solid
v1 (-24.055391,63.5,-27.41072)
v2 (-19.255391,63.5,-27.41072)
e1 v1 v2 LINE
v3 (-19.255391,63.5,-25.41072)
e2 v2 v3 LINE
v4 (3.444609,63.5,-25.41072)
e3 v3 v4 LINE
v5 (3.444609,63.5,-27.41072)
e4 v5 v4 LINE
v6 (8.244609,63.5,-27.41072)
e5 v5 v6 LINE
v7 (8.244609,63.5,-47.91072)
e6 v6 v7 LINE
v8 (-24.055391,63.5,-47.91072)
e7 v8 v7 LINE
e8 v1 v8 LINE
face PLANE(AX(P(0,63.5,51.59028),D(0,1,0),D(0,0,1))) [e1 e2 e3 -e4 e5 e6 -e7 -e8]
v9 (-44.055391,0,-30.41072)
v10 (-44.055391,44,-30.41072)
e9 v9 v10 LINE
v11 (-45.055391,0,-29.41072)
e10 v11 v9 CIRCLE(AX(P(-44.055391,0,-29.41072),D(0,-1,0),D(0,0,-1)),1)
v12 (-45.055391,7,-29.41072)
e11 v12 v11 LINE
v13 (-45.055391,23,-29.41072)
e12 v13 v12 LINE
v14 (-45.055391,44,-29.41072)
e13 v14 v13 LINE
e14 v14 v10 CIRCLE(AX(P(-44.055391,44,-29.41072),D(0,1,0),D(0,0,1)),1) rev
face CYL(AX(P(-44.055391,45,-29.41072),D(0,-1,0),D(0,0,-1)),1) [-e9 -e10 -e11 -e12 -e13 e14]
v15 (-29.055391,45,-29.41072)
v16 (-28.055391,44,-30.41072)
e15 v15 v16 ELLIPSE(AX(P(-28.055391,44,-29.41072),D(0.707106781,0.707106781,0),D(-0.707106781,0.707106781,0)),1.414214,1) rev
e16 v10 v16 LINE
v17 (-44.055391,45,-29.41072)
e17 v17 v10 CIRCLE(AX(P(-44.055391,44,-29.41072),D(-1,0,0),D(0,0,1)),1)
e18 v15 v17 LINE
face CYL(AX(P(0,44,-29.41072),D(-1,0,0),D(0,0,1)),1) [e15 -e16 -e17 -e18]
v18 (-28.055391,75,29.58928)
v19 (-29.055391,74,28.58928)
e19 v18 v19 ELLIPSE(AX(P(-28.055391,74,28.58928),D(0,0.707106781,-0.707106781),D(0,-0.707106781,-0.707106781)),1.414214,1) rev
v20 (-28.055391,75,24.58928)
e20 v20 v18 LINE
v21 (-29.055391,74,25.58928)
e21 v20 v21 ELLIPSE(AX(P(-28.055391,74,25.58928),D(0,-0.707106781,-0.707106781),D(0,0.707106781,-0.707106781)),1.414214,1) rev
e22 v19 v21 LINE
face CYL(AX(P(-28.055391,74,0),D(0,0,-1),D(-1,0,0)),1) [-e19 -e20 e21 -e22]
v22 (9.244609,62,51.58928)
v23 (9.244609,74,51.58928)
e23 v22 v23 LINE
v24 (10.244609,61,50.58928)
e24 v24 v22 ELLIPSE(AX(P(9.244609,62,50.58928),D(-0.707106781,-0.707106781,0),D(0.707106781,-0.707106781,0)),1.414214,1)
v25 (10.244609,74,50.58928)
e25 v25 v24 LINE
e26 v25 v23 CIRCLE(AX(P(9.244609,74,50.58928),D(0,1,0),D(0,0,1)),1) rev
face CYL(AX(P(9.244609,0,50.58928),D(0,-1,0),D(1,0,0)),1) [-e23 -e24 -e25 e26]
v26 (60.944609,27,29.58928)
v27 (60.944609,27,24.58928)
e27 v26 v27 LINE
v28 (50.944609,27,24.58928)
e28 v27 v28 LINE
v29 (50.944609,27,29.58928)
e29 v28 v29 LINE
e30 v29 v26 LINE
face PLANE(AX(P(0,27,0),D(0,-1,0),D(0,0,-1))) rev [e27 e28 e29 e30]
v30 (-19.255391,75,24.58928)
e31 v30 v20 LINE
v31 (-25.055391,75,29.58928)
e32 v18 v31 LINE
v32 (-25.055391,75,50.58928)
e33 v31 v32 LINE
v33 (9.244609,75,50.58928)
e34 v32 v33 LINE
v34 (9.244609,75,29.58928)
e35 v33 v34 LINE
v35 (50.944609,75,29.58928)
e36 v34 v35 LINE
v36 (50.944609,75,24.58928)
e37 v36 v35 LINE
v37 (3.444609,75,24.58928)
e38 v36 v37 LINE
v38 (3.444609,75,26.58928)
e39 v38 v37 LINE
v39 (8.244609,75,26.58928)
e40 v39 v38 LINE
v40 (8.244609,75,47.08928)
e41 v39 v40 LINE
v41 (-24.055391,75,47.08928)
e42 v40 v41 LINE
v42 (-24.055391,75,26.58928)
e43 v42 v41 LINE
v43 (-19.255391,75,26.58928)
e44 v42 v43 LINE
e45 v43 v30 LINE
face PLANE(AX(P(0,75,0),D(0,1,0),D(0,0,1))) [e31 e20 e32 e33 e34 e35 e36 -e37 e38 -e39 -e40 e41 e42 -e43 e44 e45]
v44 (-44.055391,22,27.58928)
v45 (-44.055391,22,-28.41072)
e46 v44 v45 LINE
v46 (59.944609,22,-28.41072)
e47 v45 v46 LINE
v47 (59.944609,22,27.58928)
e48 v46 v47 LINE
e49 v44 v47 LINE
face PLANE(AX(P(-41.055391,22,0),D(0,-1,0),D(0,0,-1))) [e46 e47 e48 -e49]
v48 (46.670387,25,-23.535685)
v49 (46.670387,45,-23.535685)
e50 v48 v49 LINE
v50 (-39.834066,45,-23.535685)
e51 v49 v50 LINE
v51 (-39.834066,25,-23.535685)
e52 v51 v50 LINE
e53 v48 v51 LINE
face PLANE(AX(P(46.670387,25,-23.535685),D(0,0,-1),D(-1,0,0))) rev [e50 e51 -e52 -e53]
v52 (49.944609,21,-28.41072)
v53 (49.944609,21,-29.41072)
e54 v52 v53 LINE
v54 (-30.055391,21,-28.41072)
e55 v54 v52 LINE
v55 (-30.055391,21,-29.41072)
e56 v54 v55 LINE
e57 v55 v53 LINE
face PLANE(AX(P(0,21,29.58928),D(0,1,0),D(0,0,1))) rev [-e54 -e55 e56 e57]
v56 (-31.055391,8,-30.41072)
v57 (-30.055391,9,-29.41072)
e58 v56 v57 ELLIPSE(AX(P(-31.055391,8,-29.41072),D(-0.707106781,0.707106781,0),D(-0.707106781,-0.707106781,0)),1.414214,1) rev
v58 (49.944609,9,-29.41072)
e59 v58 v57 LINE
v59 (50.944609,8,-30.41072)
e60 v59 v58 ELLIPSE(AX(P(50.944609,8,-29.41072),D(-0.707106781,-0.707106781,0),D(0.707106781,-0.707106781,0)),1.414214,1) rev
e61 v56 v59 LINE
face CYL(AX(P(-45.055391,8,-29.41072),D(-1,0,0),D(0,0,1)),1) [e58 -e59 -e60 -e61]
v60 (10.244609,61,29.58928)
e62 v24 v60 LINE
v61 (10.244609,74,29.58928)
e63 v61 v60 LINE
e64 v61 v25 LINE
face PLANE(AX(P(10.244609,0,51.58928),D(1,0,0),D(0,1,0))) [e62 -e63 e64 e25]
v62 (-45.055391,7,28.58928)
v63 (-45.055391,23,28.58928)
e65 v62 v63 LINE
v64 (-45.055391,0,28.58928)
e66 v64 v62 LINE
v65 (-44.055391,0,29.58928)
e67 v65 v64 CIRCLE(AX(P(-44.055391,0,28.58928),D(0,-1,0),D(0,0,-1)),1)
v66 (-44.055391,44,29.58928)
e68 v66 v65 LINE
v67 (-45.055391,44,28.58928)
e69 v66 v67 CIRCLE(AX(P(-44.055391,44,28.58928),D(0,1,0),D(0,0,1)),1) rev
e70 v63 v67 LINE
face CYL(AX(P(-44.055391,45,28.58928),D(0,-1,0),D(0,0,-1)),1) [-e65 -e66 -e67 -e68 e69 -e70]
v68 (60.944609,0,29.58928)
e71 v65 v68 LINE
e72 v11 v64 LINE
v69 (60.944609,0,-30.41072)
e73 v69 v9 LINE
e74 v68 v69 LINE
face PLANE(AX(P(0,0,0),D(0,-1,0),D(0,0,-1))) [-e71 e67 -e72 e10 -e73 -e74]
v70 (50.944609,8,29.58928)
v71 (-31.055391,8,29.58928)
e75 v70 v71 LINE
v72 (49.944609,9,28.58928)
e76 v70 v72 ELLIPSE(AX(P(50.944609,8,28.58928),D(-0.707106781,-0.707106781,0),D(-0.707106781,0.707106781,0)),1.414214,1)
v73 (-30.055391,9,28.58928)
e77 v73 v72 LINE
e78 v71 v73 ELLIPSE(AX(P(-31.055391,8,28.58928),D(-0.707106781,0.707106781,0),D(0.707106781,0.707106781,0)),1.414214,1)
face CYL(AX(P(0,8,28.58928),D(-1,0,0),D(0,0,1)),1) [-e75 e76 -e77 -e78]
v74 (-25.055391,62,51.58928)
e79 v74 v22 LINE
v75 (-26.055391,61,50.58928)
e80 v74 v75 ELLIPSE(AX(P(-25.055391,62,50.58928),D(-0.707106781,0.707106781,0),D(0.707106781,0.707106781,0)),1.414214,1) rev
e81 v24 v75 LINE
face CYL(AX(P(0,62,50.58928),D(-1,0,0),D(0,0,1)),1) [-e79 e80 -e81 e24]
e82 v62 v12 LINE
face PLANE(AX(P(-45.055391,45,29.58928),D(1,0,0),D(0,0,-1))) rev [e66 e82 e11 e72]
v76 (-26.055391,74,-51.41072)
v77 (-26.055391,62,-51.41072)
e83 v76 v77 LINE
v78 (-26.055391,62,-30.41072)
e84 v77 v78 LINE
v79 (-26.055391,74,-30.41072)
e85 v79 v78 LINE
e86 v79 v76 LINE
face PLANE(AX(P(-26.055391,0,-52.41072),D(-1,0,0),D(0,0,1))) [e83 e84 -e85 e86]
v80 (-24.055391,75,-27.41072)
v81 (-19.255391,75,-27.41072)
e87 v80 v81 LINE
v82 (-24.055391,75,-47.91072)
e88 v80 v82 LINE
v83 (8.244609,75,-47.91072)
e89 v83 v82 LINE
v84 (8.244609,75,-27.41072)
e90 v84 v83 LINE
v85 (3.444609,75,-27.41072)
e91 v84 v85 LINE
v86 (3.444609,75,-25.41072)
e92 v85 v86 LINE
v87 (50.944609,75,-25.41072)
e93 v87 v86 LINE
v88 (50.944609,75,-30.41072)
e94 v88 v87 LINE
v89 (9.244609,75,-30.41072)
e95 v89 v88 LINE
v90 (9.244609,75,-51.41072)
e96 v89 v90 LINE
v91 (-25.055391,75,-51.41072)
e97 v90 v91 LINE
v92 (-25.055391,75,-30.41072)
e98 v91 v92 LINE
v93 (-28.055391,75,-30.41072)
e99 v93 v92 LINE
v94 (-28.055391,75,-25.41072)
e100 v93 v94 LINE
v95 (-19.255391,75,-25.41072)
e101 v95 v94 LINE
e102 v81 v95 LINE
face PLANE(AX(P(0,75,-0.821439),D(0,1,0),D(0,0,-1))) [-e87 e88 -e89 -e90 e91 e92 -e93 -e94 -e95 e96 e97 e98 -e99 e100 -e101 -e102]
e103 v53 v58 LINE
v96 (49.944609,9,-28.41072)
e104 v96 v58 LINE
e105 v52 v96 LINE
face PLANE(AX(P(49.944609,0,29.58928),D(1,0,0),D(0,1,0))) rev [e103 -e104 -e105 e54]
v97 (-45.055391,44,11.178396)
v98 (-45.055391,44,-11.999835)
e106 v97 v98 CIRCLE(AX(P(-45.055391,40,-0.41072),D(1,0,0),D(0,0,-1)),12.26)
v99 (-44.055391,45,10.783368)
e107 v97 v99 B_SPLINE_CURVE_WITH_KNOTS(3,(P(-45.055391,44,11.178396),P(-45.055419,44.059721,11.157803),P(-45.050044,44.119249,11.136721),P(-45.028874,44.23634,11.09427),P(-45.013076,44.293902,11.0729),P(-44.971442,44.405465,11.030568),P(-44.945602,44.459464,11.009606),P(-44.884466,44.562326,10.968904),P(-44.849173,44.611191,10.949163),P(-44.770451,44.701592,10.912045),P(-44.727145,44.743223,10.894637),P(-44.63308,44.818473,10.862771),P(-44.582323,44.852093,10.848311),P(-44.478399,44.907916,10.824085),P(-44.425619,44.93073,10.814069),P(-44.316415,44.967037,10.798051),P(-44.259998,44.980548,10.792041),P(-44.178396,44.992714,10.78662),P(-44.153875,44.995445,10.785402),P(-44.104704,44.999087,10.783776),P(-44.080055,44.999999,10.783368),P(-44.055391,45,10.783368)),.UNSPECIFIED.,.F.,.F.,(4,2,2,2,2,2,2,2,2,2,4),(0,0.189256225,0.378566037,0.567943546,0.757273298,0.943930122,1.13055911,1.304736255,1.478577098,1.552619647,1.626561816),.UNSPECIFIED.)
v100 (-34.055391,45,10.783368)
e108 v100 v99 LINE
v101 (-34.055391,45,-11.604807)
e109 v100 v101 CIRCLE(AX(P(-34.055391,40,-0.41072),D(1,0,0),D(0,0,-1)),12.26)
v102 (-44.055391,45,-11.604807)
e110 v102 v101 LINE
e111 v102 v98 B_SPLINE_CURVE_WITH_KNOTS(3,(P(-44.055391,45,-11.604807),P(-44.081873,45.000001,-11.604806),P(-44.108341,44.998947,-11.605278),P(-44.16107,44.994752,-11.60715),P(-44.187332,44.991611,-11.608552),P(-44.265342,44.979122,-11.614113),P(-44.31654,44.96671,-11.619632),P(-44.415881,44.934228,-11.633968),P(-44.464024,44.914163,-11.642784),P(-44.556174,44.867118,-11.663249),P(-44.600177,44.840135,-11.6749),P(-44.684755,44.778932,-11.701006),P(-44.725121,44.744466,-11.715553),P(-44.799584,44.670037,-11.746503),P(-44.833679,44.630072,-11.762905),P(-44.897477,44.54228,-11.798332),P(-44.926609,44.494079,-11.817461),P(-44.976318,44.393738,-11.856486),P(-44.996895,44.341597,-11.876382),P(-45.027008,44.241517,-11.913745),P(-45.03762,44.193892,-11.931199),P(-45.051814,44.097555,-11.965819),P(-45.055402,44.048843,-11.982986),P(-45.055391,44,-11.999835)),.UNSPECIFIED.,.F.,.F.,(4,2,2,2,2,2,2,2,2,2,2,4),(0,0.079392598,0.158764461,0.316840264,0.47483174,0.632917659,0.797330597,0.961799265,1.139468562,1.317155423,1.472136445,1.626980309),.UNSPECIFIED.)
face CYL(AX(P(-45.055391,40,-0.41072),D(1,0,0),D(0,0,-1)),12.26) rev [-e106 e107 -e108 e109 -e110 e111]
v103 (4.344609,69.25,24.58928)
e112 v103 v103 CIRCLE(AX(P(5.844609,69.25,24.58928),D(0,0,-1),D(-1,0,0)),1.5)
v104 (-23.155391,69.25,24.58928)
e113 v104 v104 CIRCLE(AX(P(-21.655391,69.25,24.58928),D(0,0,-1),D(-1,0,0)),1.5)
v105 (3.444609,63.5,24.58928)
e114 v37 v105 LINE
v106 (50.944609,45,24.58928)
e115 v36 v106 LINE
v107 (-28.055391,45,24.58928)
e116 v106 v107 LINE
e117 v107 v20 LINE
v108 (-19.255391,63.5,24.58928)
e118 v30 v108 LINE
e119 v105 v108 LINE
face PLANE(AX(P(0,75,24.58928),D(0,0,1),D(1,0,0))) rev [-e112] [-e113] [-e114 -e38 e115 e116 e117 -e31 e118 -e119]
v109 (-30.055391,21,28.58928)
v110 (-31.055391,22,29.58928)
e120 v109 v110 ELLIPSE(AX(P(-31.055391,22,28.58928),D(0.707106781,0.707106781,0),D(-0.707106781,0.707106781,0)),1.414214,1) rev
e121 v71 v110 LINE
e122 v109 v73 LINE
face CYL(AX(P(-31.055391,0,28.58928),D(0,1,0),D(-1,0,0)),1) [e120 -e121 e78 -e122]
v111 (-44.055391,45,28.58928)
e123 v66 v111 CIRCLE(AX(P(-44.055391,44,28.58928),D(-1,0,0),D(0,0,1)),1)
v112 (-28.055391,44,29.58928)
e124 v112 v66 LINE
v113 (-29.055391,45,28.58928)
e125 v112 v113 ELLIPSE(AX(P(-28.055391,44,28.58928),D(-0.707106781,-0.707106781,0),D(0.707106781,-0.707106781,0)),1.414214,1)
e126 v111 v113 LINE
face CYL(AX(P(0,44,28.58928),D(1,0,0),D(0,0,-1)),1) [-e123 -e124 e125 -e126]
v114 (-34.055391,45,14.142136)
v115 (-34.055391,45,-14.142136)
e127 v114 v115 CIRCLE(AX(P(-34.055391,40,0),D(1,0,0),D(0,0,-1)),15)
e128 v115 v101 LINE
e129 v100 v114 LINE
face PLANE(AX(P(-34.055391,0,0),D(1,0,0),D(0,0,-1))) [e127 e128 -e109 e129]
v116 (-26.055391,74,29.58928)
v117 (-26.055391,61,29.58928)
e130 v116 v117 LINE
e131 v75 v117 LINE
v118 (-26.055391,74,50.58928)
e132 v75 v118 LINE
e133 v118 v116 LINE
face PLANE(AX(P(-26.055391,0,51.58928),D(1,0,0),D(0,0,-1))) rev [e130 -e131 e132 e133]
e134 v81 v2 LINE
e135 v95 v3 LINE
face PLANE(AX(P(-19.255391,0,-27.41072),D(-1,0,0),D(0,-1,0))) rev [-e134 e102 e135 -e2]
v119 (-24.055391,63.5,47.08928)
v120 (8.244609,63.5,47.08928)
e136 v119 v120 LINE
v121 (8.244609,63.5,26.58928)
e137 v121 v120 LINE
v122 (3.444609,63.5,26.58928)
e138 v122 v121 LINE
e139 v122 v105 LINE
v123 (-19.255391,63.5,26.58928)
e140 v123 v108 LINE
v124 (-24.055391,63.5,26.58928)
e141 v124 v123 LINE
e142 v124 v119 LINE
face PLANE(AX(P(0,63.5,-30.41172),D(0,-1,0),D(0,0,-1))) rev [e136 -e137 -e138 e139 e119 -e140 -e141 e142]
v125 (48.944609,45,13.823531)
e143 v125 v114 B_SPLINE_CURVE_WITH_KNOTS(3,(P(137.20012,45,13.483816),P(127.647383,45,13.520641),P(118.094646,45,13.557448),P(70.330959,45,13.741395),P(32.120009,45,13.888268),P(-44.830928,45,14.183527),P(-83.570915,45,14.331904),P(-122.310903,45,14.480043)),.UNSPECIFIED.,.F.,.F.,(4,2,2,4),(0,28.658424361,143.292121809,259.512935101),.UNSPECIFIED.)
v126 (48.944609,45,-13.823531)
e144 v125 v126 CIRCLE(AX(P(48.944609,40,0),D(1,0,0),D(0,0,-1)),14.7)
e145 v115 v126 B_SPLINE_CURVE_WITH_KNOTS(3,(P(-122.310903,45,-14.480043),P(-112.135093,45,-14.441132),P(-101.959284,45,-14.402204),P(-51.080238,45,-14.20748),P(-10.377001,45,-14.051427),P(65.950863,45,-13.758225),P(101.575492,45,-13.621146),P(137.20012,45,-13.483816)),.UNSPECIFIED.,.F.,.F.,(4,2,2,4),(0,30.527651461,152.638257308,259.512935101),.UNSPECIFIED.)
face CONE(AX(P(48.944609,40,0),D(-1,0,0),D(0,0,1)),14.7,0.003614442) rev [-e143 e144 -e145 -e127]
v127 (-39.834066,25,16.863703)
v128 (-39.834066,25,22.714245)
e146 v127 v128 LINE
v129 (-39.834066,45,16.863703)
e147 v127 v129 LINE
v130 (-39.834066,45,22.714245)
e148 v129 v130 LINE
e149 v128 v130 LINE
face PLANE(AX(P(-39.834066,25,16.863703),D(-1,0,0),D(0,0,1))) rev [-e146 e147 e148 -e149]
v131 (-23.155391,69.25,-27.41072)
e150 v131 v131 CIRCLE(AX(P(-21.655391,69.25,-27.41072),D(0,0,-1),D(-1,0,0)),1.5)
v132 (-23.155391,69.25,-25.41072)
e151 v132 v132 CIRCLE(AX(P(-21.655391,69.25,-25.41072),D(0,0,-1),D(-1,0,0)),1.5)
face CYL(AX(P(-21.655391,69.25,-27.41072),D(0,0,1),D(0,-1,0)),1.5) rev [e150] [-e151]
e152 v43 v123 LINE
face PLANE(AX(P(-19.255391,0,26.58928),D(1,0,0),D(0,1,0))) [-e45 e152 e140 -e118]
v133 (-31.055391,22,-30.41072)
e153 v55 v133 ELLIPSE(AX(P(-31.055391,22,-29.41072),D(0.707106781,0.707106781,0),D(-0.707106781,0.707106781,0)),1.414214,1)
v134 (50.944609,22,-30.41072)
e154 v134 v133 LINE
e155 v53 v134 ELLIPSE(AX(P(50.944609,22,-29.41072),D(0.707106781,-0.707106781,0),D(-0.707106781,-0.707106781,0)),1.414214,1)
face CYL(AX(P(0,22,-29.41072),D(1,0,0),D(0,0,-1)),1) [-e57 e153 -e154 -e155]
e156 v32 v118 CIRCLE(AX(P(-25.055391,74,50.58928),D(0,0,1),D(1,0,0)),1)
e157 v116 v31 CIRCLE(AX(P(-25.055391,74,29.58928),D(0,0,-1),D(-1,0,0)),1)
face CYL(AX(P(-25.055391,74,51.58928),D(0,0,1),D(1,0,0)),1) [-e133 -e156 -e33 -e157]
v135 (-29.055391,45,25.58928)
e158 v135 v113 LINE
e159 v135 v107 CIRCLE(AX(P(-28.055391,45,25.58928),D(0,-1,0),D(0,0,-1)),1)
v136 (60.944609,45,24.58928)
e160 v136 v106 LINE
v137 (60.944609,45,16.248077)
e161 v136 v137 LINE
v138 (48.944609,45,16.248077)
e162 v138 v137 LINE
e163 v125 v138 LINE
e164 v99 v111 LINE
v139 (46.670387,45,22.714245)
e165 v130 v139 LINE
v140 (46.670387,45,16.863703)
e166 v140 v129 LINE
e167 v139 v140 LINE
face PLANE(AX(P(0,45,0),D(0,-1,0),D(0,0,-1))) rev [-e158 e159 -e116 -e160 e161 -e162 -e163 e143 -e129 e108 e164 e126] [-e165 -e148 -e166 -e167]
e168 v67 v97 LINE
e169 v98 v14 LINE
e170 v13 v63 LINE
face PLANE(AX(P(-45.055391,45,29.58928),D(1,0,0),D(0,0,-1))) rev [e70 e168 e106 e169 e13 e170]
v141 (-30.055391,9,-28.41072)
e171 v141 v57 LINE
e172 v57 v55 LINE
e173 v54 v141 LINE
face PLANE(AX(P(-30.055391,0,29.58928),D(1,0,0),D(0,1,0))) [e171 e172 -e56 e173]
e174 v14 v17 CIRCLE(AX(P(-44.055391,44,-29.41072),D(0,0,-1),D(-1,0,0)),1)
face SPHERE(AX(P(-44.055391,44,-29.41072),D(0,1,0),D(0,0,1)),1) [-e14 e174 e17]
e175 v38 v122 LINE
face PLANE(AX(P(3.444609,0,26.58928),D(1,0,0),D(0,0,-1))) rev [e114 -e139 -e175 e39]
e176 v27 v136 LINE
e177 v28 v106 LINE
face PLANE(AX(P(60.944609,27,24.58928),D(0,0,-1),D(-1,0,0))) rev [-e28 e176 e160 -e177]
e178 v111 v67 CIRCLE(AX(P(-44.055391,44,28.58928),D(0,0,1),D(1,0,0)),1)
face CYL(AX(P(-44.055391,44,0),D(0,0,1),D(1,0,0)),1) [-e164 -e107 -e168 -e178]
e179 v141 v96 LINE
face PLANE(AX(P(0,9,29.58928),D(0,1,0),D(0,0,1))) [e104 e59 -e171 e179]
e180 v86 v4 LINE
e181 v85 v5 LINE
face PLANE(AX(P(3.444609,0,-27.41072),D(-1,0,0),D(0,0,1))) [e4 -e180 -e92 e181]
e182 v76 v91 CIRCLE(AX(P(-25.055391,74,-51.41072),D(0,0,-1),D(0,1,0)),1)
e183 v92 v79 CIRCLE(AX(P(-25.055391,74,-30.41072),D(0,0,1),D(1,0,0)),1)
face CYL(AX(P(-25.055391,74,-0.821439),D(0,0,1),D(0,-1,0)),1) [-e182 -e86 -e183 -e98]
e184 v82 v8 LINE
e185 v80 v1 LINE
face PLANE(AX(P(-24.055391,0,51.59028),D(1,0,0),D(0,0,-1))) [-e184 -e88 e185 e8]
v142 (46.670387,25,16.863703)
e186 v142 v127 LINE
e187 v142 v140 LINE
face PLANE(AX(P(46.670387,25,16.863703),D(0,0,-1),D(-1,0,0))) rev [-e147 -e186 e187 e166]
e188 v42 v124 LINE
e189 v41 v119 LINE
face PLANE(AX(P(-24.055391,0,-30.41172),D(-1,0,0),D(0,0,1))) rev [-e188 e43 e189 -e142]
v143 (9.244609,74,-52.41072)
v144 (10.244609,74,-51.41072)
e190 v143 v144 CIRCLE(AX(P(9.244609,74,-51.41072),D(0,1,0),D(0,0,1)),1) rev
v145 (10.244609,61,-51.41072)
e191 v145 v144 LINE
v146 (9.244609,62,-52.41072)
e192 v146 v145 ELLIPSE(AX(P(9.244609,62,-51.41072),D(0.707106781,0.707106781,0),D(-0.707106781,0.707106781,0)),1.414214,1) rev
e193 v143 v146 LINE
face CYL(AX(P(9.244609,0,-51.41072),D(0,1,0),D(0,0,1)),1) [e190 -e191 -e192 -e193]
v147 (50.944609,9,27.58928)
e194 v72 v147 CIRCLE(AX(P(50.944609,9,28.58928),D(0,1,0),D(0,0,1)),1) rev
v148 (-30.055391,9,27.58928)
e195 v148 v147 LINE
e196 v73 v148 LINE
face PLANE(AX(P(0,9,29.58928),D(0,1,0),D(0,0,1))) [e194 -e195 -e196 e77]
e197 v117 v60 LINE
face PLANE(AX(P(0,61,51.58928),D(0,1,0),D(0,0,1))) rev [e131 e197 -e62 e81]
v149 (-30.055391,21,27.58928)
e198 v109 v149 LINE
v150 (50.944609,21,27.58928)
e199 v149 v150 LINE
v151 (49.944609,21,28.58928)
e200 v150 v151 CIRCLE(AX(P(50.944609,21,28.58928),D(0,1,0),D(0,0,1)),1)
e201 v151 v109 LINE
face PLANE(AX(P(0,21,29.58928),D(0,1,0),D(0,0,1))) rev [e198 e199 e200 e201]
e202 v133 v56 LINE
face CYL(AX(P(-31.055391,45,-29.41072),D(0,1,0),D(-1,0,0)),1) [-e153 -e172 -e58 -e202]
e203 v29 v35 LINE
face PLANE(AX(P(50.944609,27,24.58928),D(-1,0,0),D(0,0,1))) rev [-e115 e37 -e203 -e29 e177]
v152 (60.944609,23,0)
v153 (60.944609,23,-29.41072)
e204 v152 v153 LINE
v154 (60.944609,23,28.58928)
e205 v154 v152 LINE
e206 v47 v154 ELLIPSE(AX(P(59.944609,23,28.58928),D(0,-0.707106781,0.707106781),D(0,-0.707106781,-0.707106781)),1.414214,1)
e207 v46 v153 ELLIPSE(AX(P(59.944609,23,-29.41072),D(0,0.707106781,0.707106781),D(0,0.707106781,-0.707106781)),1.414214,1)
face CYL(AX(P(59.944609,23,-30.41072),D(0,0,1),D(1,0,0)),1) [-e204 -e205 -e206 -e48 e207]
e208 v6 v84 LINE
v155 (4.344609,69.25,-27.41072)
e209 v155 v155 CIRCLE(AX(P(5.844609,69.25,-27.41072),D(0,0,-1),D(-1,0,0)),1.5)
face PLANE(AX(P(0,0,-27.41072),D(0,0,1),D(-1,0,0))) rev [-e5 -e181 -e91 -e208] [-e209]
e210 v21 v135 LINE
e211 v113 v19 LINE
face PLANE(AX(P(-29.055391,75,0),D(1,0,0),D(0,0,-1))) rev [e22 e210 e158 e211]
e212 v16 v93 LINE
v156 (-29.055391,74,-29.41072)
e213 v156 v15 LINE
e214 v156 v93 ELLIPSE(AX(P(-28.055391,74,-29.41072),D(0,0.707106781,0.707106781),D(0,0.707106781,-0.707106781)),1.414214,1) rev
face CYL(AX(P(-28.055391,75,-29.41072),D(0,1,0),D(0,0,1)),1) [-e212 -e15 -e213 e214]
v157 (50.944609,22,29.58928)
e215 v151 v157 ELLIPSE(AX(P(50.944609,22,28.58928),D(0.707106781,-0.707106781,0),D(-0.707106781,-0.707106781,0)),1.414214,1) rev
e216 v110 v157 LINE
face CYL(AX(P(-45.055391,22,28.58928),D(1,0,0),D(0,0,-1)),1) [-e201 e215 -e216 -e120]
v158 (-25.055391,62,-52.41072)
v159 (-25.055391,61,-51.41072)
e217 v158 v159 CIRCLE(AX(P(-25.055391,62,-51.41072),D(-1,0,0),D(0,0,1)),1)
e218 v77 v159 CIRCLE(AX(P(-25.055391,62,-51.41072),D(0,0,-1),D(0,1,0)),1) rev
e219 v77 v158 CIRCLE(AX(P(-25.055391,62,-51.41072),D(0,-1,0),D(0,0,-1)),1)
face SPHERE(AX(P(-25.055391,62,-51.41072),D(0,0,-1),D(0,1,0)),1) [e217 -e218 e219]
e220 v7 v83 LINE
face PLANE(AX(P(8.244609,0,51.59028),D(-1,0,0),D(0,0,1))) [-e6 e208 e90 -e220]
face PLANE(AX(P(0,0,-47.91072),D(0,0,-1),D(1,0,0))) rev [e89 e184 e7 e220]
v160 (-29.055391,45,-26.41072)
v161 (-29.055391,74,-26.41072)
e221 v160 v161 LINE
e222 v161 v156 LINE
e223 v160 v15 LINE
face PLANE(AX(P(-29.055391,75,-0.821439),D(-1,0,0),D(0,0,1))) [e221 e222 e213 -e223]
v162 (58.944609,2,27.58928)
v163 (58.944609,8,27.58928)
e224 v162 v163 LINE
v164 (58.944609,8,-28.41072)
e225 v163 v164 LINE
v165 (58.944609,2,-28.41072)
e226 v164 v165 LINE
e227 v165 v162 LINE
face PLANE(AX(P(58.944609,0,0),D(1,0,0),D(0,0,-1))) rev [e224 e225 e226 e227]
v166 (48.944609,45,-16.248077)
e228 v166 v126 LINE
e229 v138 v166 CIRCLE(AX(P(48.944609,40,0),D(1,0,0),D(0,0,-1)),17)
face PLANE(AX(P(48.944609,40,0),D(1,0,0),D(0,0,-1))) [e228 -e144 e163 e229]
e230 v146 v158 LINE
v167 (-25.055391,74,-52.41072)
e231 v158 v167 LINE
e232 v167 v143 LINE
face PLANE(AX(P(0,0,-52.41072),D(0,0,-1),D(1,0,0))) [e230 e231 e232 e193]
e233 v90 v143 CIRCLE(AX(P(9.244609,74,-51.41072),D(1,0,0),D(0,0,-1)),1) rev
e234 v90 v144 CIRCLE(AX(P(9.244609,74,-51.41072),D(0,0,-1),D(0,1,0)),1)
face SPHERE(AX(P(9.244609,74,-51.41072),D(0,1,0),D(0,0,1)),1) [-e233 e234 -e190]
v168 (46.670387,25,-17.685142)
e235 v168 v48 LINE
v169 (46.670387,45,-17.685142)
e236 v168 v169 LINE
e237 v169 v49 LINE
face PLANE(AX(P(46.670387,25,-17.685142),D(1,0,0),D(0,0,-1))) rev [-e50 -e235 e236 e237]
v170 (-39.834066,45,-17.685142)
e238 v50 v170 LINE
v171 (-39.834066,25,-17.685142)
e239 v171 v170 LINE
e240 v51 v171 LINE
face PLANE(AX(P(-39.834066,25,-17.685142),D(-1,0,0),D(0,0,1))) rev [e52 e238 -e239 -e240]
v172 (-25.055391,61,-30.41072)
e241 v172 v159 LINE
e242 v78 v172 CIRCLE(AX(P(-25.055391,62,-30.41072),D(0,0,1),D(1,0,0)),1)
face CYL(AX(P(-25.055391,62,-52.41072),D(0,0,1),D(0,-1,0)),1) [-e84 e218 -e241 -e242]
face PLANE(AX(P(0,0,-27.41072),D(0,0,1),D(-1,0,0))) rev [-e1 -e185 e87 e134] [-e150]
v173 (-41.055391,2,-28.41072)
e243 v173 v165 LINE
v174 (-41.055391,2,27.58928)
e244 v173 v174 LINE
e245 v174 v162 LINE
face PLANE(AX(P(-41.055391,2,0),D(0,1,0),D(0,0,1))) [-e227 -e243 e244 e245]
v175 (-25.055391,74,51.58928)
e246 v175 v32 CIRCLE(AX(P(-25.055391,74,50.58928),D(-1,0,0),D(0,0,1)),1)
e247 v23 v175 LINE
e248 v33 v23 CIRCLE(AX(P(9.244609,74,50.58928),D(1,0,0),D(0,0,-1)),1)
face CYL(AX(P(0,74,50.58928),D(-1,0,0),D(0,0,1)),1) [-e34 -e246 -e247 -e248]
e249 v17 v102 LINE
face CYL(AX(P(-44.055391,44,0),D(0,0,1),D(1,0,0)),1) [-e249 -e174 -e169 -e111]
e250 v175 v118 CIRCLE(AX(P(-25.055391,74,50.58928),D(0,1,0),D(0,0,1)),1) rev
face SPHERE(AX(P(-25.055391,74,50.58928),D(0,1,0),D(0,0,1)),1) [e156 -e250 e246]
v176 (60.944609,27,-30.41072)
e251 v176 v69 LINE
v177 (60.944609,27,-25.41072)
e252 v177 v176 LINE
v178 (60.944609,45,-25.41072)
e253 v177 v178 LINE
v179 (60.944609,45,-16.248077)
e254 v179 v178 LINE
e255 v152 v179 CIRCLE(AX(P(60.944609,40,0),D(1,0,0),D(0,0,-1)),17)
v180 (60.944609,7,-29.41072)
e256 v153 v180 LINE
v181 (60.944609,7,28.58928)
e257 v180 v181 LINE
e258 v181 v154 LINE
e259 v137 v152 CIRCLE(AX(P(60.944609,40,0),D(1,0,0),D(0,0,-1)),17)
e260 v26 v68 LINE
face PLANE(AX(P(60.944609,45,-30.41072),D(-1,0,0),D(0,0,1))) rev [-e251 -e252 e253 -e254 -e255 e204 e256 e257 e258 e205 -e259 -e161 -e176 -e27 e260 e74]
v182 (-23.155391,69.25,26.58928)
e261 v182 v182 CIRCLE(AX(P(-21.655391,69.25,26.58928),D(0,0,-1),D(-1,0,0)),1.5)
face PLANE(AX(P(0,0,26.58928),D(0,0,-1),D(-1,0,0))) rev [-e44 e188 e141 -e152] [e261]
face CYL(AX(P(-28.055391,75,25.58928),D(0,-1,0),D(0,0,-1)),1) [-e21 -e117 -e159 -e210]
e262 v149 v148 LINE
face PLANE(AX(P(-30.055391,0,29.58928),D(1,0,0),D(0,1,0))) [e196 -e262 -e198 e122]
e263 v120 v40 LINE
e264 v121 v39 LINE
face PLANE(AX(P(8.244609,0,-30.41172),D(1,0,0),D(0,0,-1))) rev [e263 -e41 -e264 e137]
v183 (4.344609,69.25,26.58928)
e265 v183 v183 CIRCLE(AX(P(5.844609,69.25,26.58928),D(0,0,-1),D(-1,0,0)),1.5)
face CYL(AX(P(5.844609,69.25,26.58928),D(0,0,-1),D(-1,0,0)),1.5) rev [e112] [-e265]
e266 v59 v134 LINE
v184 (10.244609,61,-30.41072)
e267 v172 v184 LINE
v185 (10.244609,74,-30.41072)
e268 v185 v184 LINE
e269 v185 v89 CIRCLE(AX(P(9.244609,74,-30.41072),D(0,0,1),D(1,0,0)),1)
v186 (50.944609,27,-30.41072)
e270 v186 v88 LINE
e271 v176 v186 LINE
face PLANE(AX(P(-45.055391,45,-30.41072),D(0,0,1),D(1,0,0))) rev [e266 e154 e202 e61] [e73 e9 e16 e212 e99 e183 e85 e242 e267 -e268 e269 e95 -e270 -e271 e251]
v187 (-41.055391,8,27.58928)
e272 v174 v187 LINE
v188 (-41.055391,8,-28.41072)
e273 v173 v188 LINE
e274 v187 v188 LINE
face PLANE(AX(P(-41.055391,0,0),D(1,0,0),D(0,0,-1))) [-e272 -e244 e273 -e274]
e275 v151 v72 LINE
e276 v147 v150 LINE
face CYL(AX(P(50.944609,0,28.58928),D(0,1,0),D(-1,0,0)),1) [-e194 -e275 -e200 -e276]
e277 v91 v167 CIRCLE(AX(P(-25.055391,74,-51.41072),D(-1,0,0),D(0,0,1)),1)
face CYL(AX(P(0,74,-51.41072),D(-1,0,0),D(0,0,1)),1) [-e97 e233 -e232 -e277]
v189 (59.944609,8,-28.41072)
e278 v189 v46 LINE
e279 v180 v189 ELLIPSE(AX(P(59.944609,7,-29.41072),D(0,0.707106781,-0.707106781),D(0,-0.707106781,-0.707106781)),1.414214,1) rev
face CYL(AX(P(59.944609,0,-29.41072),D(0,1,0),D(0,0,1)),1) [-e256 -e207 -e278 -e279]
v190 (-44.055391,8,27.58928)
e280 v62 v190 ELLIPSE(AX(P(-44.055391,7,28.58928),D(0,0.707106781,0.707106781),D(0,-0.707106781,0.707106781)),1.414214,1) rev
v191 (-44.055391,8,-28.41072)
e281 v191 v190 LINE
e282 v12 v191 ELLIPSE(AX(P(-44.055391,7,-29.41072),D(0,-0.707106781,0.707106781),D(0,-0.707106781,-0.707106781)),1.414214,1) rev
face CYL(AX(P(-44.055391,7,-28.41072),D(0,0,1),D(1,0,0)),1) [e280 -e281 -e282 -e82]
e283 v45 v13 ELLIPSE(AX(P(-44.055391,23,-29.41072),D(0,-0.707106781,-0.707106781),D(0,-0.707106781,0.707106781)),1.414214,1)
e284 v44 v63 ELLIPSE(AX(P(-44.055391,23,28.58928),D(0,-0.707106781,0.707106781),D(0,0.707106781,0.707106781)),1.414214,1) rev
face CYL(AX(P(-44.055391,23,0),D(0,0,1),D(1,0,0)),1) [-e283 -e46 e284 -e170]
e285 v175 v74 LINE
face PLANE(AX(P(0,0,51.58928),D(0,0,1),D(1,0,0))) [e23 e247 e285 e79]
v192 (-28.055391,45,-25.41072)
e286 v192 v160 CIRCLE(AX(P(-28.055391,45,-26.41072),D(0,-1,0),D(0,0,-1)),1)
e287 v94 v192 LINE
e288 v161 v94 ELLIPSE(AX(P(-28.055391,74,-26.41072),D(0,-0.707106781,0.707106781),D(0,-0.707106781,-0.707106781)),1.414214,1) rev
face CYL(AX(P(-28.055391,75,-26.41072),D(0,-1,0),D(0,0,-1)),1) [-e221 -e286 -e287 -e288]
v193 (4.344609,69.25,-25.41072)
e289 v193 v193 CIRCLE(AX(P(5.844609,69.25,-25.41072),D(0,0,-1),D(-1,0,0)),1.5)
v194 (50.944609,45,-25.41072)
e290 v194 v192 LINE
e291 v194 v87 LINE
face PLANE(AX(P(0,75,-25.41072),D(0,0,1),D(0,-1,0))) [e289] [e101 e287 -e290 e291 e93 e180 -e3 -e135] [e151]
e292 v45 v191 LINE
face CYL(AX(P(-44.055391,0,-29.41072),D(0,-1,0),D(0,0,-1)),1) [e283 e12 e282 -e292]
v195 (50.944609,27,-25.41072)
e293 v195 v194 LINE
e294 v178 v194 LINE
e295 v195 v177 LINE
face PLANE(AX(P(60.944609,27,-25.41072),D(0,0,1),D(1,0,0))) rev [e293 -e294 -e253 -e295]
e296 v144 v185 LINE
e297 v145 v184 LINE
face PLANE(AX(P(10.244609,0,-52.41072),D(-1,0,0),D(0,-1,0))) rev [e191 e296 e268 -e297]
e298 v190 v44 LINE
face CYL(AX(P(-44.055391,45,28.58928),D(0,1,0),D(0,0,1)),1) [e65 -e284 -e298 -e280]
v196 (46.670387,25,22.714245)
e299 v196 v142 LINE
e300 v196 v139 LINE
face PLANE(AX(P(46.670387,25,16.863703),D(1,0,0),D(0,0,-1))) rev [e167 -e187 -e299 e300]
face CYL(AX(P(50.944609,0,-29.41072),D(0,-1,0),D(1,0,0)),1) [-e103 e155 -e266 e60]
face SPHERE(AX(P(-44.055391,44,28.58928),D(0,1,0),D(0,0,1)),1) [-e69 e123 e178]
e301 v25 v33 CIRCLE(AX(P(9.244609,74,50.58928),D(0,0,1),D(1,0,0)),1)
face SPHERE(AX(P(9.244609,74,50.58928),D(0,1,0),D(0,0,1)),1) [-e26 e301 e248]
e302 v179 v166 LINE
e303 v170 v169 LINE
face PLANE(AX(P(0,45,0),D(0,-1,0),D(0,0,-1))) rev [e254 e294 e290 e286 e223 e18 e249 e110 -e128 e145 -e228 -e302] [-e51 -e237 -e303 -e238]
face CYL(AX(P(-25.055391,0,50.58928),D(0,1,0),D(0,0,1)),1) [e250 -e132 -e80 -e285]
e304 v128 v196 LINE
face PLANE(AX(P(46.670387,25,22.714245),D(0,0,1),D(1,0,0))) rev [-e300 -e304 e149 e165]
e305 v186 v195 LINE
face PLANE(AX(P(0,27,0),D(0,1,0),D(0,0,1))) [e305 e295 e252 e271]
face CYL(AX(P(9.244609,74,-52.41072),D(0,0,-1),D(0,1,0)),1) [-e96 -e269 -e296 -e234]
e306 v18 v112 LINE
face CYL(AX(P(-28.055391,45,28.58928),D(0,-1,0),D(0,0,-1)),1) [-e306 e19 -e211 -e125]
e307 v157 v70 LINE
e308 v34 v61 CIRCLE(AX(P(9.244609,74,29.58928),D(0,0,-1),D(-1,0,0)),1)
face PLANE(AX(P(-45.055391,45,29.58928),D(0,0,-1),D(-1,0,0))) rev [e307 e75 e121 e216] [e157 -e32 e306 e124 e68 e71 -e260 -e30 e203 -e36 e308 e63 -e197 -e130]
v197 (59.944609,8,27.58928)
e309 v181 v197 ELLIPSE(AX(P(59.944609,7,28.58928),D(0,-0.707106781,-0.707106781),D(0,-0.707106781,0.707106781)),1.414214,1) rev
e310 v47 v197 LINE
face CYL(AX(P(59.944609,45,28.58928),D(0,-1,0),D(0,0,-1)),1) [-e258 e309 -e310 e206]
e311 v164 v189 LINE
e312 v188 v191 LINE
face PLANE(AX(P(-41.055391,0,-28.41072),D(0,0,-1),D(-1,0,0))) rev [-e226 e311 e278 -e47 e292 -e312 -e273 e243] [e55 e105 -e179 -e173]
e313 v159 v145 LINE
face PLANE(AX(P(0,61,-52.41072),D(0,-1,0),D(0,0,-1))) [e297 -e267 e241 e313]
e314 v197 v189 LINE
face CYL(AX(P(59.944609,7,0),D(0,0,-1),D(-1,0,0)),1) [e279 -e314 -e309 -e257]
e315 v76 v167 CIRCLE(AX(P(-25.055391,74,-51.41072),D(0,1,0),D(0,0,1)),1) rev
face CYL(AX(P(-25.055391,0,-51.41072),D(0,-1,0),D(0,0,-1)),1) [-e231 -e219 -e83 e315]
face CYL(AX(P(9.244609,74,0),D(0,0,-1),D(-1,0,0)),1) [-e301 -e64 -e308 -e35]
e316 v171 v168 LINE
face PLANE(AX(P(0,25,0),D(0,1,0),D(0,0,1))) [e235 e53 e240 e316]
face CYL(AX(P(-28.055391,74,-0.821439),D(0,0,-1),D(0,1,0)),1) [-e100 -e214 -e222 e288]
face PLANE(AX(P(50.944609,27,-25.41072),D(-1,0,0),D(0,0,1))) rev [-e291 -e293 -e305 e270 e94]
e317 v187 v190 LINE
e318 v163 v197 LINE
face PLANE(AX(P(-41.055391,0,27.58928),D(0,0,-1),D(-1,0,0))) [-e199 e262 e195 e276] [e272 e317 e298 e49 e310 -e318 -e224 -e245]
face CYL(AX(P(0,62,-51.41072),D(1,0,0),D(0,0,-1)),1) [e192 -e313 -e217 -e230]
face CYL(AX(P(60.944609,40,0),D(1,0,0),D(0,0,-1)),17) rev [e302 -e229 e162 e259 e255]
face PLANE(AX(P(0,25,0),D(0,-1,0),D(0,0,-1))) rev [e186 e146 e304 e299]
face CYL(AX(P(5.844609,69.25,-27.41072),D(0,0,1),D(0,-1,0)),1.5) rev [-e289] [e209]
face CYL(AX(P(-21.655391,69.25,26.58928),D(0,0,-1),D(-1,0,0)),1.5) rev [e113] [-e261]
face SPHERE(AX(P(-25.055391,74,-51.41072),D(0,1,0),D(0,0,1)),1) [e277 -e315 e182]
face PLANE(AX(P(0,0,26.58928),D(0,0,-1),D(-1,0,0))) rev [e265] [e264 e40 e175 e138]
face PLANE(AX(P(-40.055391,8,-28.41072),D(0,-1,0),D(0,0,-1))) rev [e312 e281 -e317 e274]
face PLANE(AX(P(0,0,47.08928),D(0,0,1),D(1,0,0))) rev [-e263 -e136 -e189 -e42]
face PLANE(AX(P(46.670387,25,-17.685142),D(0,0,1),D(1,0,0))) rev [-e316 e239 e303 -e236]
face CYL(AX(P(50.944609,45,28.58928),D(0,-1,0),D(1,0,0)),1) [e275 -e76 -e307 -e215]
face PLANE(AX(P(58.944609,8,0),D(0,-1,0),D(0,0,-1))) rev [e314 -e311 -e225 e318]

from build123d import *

# Parameters (mm, degrees)
SKETCH_1_W             = 106
SKETCH_1_H             = 60
ARDUINO_DEPTH          = 45
ARDUINO_2_DEPTH        = 102
SKETCH_3_W             = 28
SKETCH_3_H             = 6
ARDUINO_3_DEPTH        = 2
SKETCH_4_W             = 40
SKETCH_4_H             = 12
ARDUINO_4_DEPTH        = 60
ARDUINO_5_DEPTH        = 5
SKETCH_11_W            = 12
SKETCH_11_H            = 17
SKETCH_13_R            = 12.26
CUT_EXTRUDE_2679_DEPTH = 110.42948373
SKETCH_25_W            = 90
SKETCH_25_H            = 5
EXTRUDE_3075_DEPTH     = 30
EXTRUDE_3668_DEPTH     = 22
CUT_EXTRUDE_1_REACH    = 115.751
CUT_EXTRUDE_2_DEPTH    = 17.5
SKETCH_28_W            = 4.8
SKETCH_28_H            = 11.5
SKETCH_28_R            = 1.5
EXTRUDE_4845_DEPTH     = 2
FILLET_1_R             = 1
SKETCH_30_W            = 10
SKETCH_30_H            = 5
CUT_EXTRUDE_2_2_DEPTH  = 48
SKETCH_32_W            = 86.504453115
SKETCH_32_H            = 5.850542723
SKETCH_32_H_2          = 5.850542722
CUT_EXTRUDE_4_DEPTH    = 20


with BuildPart() as part:
    # 草图1 → arduino (new body)
    with BuildSketch(Plane(origin=(0, 0, 0), x_dir=(1, 0, 0), z_dir=(0, 1, 0))):
        with Locations((7.944608655, 0.410719743)):
            Rectangle(SKETCH_1_W, SKETCH_1_H)
    extrude(amount=ARDUINO_DEPTH)

    # 草图2 → arduino 2 (cut)
    with BuildSketch(Plane(origin=(60.944608655, 0, 0), x_dir=(0, 0, -1), z_dir=(1, 0, 0))):
        Polygon((-27.589280257, 22), (28.410719743, 22), (28.410719743, 2), (0.410719743, 2), (-27.589280257, 2), align=None)
    extrude(amount=-ARDUINO_2_DEPTH, mode=Mode.SUBTRACT)

    # 草图3 → arduino 3 (add)
    with BuildSketch(Plane(origin=(60.944608655, 0, 0), x_dir=(0, 0, -1), z_dir=(1, 0, 0))):
        with Locations((14.410719743, 5)):
            Rectangle(SKETCH_3_W, SKETCH_3_H)
        with Locations((-13.589280257, 5)):
            Rectangle(SKETCH_3_W, SKETCH_3_H)
    extrude(amount=-ARDUINO_3_DEPTH)

    # 草图4 → arduino 4 (cut)
    with BuildSketch(Plane(origin=(0, 0, -30.410719743), x_dir=(-1, 0, 0), z_dir=(0, 0, -1))):
        with Locations((10.055391345, 15)):
            Rectangle(SKETCH_4_W, SKETCH_4_H)
        with Locations((-29.944608655, 15)):
            Rectangle(SKETCH_4_W, SKETCH_4_H)
    extrude(amount=-ARDUINO_4_DEPTH, mode=Mode.SUBTRACT)

    # 草图7 → arduino 5 (cut)
    with BuildSketch(Plane.ZY.offset(45.055391345)):
        Polygon((-0.410719743, 22), (-28.410719743, 22), (-28.410719743, 8), (27.589280257, 8), (27.589280257, 22), align=None)
    extrude(amount=-ARDUINO_5_DEPTH, mode=Mode.SUBTRACT)

    # 草图11 → Cut-Revolve 2344 (revolve, cut)
    with BuildSketch(Plane.XY):
        with Locations((54.944608655, 31.5)):
            Rectangle(SKETCH_11_W, SKETCH_11_H)
    revolve(axis=Axis((60.944608655, 40, 0), (-1, 0, 0)), mode=Mode.SUBTRACT)

    # 草图12 → Cut-Revolve 2556 (revolve, cut)
    with BuildSketch(Plane.XY):
        Polygon((48.944608655, 25.3), (48.944608655, 40), (-34.055391345, 40), (-34.055391345, 25), align=None)
    revolve(axis=Axis((48.944608655, 40, 0), (-1, 0, 0)), mode=Mode.SUBTRACT)

    # 草图13 → Cut-Extrude 2679 (cut, through all)
    with BuildSketch(Plane(origin=(-34.055391345, 0, 0), x_dir=(0, 0, -1), z_dir=(1, 0, 0))):
        with Locations((0.410719743, 40)):
            Circle(SKETCH_13_R)
    extrude(amount=-CUT_EXTRUDE_2679_DEPTH, mode=Mode.SUBTRACT)

    # 草图25 → Extrude 3075 (add)
    with BuildSketch(Plane(origin=(0, 45, 0), x_dir=(1, 0, 0), z_dir=(0, 1, 0))):
        with Locations((15.944608655, -27.089280257)):
            Rectangle(SKETCH_25_W, SKETCH_25_H)
    extrude_3075 = extrude(amount=EXTRUDE_3075_DEPTH)

    # 草图26 → Extrude 3668 (add)
    with BuildSketch(Plane.XY.offset(29.589280257)):
        Polygon((10.244608655, 61), (10.244608655, 75), (8.244608655, 75), (8.244608655, 63.5), (-24.055391345, 63.5), (-24.055391345, 75), (-26.055391345, 75), (-26.055391345, 61), align=None)
        Polygon((8.244608655, 63.5), (8.244608655, 75), (-16.055391345, 75), (-24.055391345, 75), (-24.055391345, 63.5), align=None)
    extrude_3668 = extrude(amount=EXTRUDE_3668_DEPTH)

    # 草图26<3> → 舵机舱切除1 (cut, up to next)
    with BuildSketch(Plane.XY.offset(29.589280257), mode=Mode.PRIVATE) as cut_extrude_1_sk1:
        Polygon((8.244608655, 63.5), (8.244608655, 75), (-16.055391345, 75), (-24.055391345, 75), (-24.055391345, 63.5), align=None)
    cut_extrude_1_tool1 = extrude(cut_extrude_1_sk1.sketch, amount=-CUT_EXTRUDE_1_REACH, mode=Mode.PRIVATE) & part.part
    cut_extrude_1 = cut_extrude_1_tool1.solids().sort_by_distance((-7.905391, 69.25, 29.58928))[0]
    add(cut_extrude_1, mode=Mode.SUBTRACT)

    # 草图26<4> → Cut-Extrude 2 (cut)
    with BuildSketch(Plane.XY.offset(29.589280257)):
        Polygon((8.244608655, 63.5), (8.244608655, 75), (-16.055391345, 75), (-24.055391345, 75), (-24.055391345, 63.5), align=None)
    cut_extrude_2 = extrude(amount=CUT_EXTRUDE_2_DEPTH, mode=Mode.SUBTRACT)

    # 草图28 → Extrude 4845 (add)
    # profile 1 of 2: a face of its own
    with BuildSketch(Plane(origin=(0, 0, 24.589280257), x_dir=(-1, 0, 0), z_dir=(0, 0, -1))):
        with Locations((-5.844608655, 69.25)):
            Rectangle(SKETCH_28_W, SKETCH_28_H)
        with Locations((-5.844608655, 69.25)):
            Circle(SKETCH_28_R, mode=Mode.SUBTRACT)
    # profile 2 of 2: a face of its own
    with BuildSketch(Plane(origin=(0, 0, 24.589280257), x_dir=(-1, 0, 0), z_dir=(0, 0, -1))):
        with Locations((21.655391345, 69.25)):
            Rectangle(SKETCH_28_W, SKETCH_28_H)
        with Locations((21.655391345, 69.25)):
            Circle(SKETCH_28_R, mode=Mode.SUBTRACT)
    extrude_4845 = extrude(amount=-EXTRUDE_4845_DEPTH)

    # Mirror 4928: Extrude 3075, Extrude 3668, 舵机舱切除1, Cut-Extrude 2, Extrude 4845 across plane
    add(extrude_3075.mirror(Plane(origin=(0, 0, -0.410719743), x_dir=(1, 0, 0), z_dir=(0, 0, -1))))
    add(extrude_3668.mirror(Plane(origin=(0, 0, -0.410719743), x_dir=(1, 0, 0), z_dir=(0, 0, -1))))
    add(cut_extrude_1.mirror(Plane(origin=(0, 0, -0.410719743), x_dir=(1, 0, 0), z_dir=(0, 0, -1))), mode=Mode.SUBTRACT)
    add(cut_extrude_2.mirror(Plane(origin=(0, 0, -0.410719743), x_dir=(1, 0, 0), z_dir=(0, 0, -1))), mode=Mode.SUBTRACT)
    add(extrude_4845.mirror(Plane(origin=(0, 0, -0.410719743), x_dir=(1, 0, 0), z_dir=(0, 0, -1))))

    # 变化圆角1
    fillet_1_edges = [part.edges().sort_by_distance(p)[0] for p in [
        (-45.055391345, 45, 20.18632412),
        (-29.055391345, 60, 24.589280257),
        (-29.055391345, 60, 29.589280257),
        (-29.055391345, 75, 27.089280257),
        (10.244608655, 75, 40.589280257),
        (-26.055391345, 75, 40.589280257),
        (10.244608655, 68, 51.589280257),
        (-7.905391345, 75, 51.589280257),
        (-26.055391345, 68, 51.589280257),
        (-7.905391345, 61, 51.589280257),
        (60.944608655, 22, -0.410719743),
        (-37.055391345, 45, -30.410719743),
        (-29.055391345, 75, -27.910719743),
        (-29.055391345, 60, -30.410719743),
        (-29.055391345, 60, -25.410719743),
        (-7.905391345, 75, -52.410719743),
        (-26.055391345, 75, -41.410719743),
        (10.244608655, 75, -41.410719743),
        (-7.905391345, 61, -52.410719743),
        (-26.055391345, 68, -52.410719743),
        (-26.055391345, 61, -41.410719743),
        (10.244608655, 68, -52.410719743),
        (60.944608655, 15, 27.589280257),
        (60.944608655, 15, -28.410719743),
        (60.944608655, 8, -0.410719743),
        (-45.055391345, 45, -21.007763606),
        (-30.055391345, 15, -30.410719743),
        (9.944608655, 9, -30.410719743),
        (49.944608655, 15, 27.589280257),
        (9.944608655, 21, 29.589280257),
        (49.944608655, 15, 29.589280257),
        (-30.055391345, 15, 29.589280257),
        (9.944608655, 9, 29.589280257),
        (9.944608655, 21, -30.410719743),
        (49.944608655, 15, -30.410719743),
        (-45.055391345, 22.5, -30.410719743),
        (-45.055391345, 22.5, 29.589280257),
        (-45.055391345, 22, -0.410719743),
        (-37.055391345, 45, 29.589280257),
        (-45.055391345, 15, 27.589280257),
        (-45.055391345, 15, -28.410719743),
        (-45.055391345, 8, -0.410719743),
    ]]
    fillet(fillet_1_edges, radius=FILLET_1_R - 0.0001)  # a hair under: the kernel refuses the full size

    # 草图30 → Cut-Extrude 2 2 (cut)
    with BuildSketch(Plane(origin=(0, 75, 0), x_dir=(1, 0, 0), z_dir=(0, 1, 0))):
        with Locations((55.944608655, -27.089280257)):
            Rectangle(SKETCH_30_W, SKETCH_30_H)
        with Locations((55.944608655, 27.910719743)):
            Rectangle(SKETCH_30_W, SKETCH_30_H)
    extrude(amount=-CUT_EXTRUDE_2_2_DEPTH, mode=Mode.SUBTRACT)

    # 草图32 → 切除-拉伸4 (cut)
    with BuildSketch(Plane(origin=(0, 45, 0), x_dir=(1, 0, 0), z_dir=(0, 1, 0))):
        with Locations((3.4181604, 20.610413575)):
            Rectangle(SKETCH_32_W, SKETCH_32_H)
        with Locations((3.4181604, -19.788974089)):
            Rectangle(SKETCH_32_W, SKETCH_32_H_2)
    extrude(amount=-CUT_EXTRUDE_4_DEPTH, mode=Mode.SUBTRACT)


solid = part.part
